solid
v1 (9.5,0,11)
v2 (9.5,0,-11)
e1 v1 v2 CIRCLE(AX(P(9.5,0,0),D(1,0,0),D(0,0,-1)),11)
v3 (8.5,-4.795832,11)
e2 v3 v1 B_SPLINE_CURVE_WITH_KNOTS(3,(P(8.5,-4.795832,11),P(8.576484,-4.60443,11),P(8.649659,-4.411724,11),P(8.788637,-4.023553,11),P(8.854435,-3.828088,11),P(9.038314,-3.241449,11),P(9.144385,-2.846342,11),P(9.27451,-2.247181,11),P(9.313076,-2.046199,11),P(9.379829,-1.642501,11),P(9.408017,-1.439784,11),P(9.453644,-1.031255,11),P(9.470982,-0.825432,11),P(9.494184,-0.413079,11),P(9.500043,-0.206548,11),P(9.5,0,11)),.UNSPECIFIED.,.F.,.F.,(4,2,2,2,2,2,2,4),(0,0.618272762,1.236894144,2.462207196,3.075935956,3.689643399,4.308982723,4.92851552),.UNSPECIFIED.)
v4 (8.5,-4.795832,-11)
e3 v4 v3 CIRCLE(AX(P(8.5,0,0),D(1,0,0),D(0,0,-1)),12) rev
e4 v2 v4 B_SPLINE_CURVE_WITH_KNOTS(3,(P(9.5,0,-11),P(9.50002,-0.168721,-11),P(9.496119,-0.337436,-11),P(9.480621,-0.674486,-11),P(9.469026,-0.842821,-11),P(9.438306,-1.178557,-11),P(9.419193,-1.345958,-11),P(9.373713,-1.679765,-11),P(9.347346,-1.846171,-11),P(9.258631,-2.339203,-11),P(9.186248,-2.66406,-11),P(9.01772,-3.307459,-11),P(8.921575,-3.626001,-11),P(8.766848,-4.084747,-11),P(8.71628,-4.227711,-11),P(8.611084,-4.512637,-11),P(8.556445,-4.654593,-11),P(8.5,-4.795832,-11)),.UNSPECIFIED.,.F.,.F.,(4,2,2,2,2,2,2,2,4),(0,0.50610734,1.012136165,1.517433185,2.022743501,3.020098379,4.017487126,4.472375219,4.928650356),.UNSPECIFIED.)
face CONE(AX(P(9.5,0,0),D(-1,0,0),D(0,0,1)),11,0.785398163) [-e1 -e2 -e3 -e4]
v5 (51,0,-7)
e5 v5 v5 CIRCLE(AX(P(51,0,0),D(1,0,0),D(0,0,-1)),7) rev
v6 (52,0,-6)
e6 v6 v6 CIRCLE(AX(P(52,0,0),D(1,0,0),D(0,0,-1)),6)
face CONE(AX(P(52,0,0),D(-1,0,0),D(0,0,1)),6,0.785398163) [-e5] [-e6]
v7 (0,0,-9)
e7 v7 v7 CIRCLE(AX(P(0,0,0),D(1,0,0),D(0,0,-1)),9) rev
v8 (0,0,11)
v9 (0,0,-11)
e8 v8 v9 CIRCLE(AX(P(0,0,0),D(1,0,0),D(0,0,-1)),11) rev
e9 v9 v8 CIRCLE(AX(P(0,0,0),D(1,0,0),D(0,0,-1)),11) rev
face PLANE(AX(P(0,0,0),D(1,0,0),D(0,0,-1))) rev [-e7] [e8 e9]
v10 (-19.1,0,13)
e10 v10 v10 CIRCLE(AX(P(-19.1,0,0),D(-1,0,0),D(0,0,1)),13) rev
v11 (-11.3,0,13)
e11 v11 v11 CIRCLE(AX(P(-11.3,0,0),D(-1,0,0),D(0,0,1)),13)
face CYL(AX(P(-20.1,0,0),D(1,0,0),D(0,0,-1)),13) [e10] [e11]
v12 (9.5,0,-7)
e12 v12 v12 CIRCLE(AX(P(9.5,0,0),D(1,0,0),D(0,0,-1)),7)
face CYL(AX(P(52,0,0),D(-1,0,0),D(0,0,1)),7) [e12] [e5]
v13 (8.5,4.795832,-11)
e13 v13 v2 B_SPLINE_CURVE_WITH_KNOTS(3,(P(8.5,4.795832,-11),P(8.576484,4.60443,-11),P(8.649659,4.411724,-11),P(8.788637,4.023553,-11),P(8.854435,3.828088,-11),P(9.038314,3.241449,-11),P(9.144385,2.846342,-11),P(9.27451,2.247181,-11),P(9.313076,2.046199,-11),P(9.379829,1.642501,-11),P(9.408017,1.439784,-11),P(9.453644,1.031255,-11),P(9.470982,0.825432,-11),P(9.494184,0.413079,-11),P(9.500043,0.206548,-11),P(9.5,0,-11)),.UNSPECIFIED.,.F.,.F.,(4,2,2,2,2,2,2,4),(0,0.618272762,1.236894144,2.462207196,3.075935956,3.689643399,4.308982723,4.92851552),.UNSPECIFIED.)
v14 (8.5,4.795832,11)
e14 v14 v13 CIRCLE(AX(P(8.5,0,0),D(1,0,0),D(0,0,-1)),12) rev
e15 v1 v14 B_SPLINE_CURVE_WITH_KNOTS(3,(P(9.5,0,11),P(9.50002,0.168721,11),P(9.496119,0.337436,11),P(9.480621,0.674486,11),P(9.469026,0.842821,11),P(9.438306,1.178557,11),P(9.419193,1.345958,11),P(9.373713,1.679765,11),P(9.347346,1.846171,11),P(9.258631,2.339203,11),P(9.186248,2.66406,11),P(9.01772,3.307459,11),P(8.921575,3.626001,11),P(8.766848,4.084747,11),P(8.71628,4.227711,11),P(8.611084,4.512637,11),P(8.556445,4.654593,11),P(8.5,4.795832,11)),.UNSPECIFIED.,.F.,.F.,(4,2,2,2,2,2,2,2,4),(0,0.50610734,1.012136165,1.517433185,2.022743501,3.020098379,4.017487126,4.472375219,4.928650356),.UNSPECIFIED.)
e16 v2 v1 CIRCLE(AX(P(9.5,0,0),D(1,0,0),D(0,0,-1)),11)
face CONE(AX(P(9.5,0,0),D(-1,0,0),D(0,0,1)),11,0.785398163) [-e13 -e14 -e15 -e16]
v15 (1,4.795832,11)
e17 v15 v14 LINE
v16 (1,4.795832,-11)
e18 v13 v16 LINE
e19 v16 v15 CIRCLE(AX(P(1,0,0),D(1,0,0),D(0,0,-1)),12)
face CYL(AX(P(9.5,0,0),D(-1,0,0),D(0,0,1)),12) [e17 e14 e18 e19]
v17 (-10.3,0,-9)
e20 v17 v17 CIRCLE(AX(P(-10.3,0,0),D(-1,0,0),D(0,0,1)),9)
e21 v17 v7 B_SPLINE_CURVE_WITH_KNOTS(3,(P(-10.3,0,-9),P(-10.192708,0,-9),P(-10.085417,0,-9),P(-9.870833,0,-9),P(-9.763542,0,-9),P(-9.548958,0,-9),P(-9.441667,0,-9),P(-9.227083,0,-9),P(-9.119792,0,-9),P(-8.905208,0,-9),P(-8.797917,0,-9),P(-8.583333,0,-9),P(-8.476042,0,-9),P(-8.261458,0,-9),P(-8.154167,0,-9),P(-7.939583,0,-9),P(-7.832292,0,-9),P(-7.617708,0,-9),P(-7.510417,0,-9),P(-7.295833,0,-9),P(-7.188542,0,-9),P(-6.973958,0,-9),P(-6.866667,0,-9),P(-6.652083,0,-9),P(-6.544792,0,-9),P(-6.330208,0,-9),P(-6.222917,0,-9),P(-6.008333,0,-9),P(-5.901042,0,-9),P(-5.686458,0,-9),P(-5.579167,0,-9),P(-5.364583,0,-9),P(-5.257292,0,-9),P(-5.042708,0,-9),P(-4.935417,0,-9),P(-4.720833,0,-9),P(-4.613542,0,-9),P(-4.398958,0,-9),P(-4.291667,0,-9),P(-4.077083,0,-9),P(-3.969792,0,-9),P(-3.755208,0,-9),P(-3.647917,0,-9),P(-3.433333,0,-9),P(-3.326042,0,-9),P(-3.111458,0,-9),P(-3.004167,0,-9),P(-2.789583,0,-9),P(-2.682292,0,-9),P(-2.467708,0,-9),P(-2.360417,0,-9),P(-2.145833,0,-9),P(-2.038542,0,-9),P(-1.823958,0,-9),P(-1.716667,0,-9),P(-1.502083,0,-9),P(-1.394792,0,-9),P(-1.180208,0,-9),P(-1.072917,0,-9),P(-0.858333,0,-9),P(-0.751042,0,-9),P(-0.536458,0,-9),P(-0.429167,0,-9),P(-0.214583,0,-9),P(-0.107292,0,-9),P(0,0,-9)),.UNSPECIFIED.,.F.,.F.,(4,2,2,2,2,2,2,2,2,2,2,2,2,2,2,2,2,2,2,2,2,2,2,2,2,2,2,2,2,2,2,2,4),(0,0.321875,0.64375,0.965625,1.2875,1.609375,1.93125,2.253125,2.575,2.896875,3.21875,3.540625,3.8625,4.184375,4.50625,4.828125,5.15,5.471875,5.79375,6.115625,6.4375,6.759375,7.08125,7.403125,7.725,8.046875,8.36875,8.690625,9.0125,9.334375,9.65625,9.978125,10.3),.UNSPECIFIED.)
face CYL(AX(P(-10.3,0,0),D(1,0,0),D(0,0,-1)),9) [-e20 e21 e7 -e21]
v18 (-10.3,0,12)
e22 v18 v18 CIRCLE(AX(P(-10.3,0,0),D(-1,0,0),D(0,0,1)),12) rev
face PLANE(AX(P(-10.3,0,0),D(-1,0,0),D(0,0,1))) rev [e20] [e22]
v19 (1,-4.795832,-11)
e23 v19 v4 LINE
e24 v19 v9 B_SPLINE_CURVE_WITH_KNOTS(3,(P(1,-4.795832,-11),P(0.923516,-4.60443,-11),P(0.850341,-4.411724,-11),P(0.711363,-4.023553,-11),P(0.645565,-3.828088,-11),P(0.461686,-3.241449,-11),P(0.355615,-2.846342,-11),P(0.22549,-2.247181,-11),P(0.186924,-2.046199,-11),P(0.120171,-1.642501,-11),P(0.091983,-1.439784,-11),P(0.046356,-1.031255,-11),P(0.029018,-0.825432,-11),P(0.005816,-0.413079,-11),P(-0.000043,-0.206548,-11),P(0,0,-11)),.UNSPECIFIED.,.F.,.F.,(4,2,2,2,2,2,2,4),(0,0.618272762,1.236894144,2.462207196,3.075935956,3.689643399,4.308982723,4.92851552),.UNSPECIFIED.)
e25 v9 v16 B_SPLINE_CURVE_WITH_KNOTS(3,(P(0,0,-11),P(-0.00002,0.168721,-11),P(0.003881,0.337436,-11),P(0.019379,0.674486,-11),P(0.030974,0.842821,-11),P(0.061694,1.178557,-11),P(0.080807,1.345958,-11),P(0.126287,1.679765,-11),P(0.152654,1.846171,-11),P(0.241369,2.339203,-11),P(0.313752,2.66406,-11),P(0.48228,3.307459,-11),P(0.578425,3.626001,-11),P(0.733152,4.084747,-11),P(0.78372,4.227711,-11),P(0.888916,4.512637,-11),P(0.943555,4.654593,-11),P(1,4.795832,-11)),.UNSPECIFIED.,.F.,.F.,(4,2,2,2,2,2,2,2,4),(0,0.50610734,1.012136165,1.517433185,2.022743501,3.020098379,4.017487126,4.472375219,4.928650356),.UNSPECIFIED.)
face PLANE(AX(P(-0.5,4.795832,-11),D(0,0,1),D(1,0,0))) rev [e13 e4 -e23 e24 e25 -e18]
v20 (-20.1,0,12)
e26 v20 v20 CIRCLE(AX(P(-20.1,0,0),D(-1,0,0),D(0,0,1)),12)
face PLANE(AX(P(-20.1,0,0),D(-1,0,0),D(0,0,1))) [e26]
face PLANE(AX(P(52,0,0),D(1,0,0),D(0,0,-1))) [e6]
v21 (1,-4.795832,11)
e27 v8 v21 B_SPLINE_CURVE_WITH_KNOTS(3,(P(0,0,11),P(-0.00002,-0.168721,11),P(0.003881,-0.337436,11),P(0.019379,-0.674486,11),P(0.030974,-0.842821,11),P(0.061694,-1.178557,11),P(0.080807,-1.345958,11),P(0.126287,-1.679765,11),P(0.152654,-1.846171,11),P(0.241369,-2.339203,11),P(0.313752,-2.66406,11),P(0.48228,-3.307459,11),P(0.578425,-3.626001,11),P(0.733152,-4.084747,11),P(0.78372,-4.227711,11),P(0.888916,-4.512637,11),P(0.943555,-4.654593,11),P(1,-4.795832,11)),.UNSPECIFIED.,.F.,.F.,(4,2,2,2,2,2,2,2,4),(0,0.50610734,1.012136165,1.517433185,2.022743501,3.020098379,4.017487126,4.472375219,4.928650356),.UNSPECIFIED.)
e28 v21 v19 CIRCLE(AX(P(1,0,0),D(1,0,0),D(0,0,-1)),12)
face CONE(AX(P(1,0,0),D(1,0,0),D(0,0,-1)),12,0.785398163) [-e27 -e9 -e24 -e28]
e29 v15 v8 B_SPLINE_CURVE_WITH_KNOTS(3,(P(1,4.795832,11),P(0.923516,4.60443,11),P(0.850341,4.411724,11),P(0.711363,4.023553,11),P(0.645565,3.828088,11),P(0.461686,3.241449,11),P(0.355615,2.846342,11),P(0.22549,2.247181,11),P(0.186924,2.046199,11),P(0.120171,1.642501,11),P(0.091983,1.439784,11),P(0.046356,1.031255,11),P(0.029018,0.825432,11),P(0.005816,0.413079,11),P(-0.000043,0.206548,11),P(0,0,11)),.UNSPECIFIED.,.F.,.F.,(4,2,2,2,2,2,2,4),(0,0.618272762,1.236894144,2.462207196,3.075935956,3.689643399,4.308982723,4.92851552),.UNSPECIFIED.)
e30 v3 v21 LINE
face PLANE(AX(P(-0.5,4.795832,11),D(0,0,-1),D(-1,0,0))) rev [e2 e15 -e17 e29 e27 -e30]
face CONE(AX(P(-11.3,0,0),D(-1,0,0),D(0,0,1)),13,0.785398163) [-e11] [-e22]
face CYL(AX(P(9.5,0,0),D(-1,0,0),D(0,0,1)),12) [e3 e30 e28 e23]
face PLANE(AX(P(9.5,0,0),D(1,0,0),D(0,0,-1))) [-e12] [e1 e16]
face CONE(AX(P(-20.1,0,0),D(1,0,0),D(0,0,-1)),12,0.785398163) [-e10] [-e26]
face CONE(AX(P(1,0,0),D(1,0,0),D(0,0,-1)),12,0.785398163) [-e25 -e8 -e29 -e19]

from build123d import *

# Parameters (mm, degrees)
SKETCH_1_R          = 12
EXTRUDE_1_DEPTH     = 9.5
SKETCH_2_R          = 7
EXTRUDE_2_DEPTH     = 42.5
SKETCH_3_R          = 9
EXTRUDE_3_DEPTH     = 10.3
SKETCH_4_R          = 13
EXTRUDE_4_DEPTH     = 9.8
CUT_EXTRUDE_START   = -10
CUT_EXTRUDE_3_DEPTH = 10
CHAMFER_1_SIZE      = 1


with BuildPart() as part:
    # 草圖1 → 伸長1 (new body)
    with BuildSketch(Plane(origin=(0, 0, 0), x_dir=(0, 0, -1), z_dir=(1, 0, 0))):
        Circle(SKETCH_1_R)
    extrude(amount=EXTRUDE_1_DEPTH)

    # 草圖2 → 伸長2 (add)
    with BuildSketch(Plane(origin=(9.5, 0, 0), x_dir=(0, 0, -1), z_dir=(1, 0, 0))):
        Circle(SKETCH_2_R)
    extrude(amount=EXTRUDE_2_DEPTH)

    # 草圖3 → 伸長3 (add)
    with BuildSketch(Plane.ZY):
        with Locations(Location((0, 0, 0), (0, 0, 180))):
            Circle(SKETCH_3_R)
    extrude(amount=EXTRUDE_3_DEPTH)

    # 草圖4 → 伸長4 (add)
    with BuildSketch(Plane.ZY.offset(10.3)):
        Circle(SKETCH_4_R)
    extrude(amount=EXTRUDE_4_DEPTH)

    # 草圖5 → 除料-伸長3 (cut)
    with BuildSketch(Plane(origin=(9.5, 0, 0), x_dir=(0, 0, -1), z_dir=(1, 0, 0)).offset(CUT_EXTRUDE_START)):
        with BuildLine():
            Line((-11, 4.795831523), (-11, -4.795831523))
            ThreePointArc((-11, -4.795831523), (-12, 0), (-11, 4.795831523))
        make_face()
        with BuildLine():
            Line((11, 4.795831523), (11, -4.795831523))
            ThreePointArc((11, -4.795831523), (12, 0), (11, 4.795831523))
        make_face()
    extrude(amount=CUT_EXTRUDE_3_DEPTH, mode=Mode.SUBTRACT)

    # 導角1
    chamfer_1_edges = [part.edges().sort_by_distance(p)[0] for p in [
        (-20.1, 0, -13),
        (-10.3, 0, -13),
        (9.5, 12, 0),
        (9.5, -12, 0),
        (0, 12, 0),
        (0, -12, 0),
        (52, 0, 7),
    ]]
    chamfer(chamfer_1_edges, length=CHAMFER_1_SIZE - 0.0001)  # a hair under: the kernel refuses the full size


solid = part.part
